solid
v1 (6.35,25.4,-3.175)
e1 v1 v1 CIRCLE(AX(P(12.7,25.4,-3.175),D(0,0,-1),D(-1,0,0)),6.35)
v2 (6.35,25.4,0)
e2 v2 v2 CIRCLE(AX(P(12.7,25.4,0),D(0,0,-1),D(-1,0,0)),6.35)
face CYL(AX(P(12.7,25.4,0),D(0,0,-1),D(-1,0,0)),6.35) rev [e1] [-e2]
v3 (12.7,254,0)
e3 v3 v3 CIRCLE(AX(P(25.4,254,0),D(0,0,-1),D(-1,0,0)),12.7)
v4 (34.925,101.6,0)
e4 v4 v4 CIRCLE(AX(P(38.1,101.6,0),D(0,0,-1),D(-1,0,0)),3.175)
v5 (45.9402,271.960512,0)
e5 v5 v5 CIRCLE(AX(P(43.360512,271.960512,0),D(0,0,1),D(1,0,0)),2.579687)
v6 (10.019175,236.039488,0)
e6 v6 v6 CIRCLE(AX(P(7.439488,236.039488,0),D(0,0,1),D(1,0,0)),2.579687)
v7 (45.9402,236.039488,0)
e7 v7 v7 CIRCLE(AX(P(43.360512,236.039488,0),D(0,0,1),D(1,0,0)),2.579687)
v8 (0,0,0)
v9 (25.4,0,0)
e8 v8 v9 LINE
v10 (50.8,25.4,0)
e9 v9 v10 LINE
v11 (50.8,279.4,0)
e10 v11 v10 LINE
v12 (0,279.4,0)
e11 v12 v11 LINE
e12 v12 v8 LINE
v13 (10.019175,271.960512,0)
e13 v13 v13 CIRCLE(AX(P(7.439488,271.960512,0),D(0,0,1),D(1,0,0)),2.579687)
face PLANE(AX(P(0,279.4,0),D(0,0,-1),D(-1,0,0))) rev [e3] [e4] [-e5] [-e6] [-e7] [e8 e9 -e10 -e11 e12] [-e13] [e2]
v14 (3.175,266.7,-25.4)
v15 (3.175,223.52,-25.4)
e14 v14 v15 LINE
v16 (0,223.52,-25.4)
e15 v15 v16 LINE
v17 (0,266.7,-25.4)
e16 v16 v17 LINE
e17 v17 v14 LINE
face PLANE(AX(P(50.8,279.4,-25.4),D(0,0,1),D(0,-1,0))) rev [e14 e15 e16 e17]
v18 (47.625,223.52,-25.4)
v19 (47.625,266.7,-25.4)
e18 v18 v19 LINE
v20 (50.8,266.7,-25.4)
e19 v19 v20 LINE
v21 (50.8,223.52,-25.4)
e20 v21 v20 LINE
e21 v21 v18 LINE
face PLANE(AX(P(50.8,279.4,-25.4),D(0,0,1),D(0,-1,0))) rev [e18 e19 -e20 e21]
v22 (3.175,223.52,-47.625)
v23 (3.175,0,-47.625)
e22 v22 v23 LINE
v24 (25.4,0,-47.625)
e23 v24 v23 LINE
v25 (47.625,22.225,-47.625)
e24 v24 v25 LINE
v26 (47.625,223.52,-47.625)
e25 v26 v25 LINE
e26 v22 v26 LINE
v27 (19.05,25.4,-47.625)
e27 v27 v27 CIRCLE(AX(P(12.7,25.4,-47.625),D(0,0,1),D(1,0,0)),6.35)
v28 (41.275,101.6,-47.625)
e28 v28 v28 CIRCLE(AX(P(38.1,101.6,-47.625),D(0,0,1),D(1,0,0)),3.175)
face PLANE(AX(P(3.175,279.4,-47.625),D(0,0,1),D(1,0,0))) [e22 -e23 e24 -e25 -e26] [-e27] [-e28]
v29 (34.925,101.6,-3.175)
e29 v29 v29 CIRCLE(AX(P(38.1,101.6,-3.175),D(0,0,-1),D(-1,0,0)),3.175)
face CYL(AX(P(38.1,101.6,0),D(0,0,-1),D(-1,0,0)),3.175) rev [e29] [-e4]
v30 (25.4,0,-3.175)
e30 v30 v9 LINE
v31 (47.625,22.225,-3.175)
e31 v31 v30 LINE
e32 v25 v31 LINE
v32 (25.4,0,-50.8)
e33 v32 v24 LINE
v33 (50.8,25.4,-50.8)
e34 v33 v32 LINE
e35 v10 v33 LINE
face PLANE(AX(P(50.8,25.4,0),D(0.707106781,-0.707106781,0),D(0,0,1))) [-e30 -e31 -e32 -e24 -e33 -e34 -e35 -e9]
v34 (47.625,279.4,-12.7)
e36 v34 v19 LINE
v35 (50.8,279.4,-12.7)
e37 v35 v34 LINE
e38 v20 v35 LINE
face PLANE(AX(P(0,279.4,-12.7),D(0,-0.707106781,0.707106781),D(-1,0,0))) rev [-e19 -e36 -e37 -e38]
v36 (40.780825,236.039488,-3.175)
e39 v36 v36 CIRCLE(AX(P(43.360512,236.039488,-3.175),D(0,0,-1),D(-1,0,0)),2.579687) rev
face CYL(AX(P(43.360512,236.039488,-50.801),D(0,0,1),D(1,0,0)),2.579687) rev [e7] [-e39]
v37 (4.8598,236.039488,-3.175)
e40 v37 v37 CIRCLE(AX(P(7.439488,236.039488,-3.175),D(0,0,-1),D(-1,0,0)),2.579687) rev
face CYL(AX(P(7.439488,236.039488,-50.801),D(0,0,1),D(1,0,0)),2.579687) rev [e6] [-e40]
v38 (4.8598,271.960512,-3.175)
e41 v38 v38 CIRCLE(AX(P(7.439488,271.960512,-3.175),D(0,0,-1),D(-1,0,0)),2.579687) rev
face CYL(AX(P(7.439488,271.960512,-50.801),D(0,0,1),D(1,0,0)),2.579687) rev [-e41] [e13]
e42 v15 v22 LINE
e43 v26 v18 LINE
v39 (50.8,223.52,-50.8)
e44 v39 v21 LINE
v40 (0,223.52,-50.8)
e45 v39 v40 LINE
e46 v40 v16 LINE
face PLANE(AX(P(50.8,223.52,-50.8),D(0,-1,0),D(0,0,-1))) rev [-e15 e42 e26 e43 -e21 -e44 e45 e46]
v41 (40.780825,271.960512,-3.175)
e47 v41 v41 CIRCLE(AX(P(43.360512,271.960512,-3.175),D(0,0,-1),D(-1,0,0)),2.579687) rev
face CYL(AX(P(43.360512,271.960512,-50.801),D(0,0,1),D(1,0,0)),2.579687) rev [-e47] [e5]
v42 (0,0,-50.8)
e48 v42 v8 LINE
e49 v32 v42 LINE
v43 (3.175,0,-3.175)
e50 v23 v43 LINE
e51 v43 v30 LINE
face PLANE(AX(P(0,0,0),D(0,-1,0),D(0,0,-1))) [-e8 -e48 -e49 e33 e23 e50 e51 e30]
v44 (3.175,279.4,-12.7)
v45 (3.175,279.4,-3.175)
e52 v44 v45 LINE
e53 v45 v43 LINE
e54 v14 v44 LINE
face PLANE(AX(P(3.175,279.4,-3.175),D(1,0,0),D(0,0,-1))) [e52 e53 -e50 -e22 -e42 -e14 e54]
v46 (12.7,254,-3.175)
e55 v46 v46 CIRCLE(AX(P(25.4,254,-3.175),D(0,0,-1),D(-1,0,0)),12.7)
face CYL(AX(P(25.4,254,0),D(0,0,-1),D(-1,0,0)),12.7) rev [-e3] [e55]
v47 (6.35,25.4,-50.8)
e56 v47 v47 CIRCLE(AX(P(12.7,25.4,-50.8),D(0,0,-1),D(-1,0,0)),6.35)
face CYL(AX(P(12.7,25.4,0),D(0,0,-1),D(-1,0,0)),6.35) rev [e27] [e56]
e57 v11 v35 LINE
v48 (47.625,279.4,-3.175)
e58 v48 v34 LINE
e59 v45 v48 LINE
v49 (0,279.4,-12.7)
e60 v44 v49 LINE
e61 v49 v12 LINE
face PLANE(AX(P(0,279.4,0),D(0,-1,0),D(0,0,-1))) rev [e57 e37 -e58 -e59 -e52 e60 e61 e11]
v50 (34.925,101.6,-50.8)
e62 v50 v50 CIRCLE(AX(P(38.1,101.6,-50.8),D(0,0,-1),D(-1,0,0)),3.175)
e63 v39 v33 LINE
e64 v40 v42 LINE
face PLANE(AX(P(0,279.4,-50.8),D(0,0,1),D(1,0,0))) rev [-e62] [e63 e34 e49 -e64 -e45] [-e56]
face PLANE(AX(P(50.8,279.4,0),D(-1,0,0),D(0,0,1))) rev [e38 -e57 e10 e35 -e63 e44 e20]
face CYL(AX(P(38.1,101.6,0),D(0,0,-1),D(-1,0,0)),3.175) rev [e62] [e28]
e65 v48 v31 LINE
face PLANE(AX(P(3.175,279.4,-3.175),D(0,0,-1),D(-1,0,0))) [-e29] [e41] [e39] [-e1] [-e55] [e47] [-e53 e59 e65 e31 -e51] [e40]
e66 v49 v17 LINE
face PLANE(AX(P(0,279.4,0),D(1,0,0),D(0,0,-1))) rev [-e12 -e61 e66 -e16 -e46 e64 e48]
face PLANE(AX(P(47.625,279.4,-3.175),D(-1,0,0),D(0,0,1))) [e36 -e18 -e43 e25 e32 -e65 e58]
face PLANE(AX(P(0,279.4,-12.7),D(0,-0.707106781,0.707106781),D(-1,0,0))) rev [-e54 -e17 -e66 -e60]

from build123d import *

# Parameters (mm, degrees)
SKETCH1_W           = 50.8
SKETCH1_H           = 50.8
SKETCH1_W_2         = 44.45
SKETCH1_H_2         = 44.45
BOSS_EXTRUDE1_DEPTH = 279.4
SKETCH2_R           = 6.35
SKETCH2_R_2         = 12.7
CUT_EXTRUDE1_DEPTH  = 289.488543967
CHAMFER1_SIZE       = 25.4
SKETCH3_R           = 3.175
CUT_EXTRUDE2_DEPTH  = 289.488543967
SKETCH4_W           = 25.4
SKETCH4_H           = 55.88
CUT_EXTRUDE3_DEPTH  = 289.488543967
CHAMFER2_SIZE       = 12.7
CUT_EXTRUDE5_REACH  = 290.489
SKETCH6_R           = 2.5796875


with BuildPart() as part:
    # Sketch1 → Boss-Extrude1 (new body)
    with BuildSketch(Plane(origin=(0, 0, 0), x_dir=(1, 0, 0), z_dir=(0, 1, 0))):
        with Locations((25.4, 25.4)):
            Rectangle(SKETCH1_W, SKETCH1_H)
        with Locations((25.4, 25.4)):
            Rectangle(SKETCH1_W_2, SKETCH1_H_2, mode=Mode.SUBTRACT)
    extrude(amount=BOSS_EXTRUDE1_DEPTH)

    # Sketch2 → Cut-Extrude1 (cut, through all)
    with BuildSketch(Plane(origin=(0, 0, -50.8), x_dir=(-1, 0, 0), z_dir=(0, 0, -1))):
        with Locations((-12.7, 25.4)):
            Circle(SKETCH2_R)
        with Locations((-25.4, 254)):
            Circle(SKETCH2_R_2)
    extrude(amount=-CUT_EXTRUDE1_DEPTH, mode=Mode.SUBTRACT)

    # Chamfer1
    # the kernel refuses this chamfer: 25.4 mm, written as the material it takes off along each edge
    with BuildSketch(Plane(origin=(50.8, 0, 65.320747894), x_dir=(-0.9996219169112966, -0.02749587661058637, 0), z_dir=(0, 0, -1))) as chamfer1_piece_1:
        Polygon((CHAMFER1_SIZE * 0.999621916911, CHAMFER1_SIZE * 0.0274958766106), (-CHAMFER1_SIZE * 0.0274958766106, CHAMFER1_SIZE * 0.999621916911), (0, 0), align=None)
    extrude(amount=181.441495789, mode=Mode.SUBTRACT)

    # Sketch3 → Cut-Extrude2 (cut, through all)
    with BuildSketch(Plane(origin=(0, 0, -50.8), x_dir=(-1, 0, 0), z_dir=(0, 0, -1))):
        with Locations((-38.1, 101.6)):
            Circle(SKETCH3_R)
    extrude(amount=-CUT_EXTRUDE2_DEPTH, mode=Mode.SUBTRACT)

    # Sketch4 → Cut-Extrude3 (cut, through all)
    with BuildSketch(Plane.ZY):
        with Locations((-38.1, 251.46)):
            Rectangle(SKETCH4_W, SKETCH4_H)
    extrude(amount=-CUT_EXTRUDE3_DEPTH, mode=Mode.SUBTRACT)

    # Chamfer2
    chamfer2_edges = [part.edges().sort_by_distance(p)[0] for p in [
        (49.2125, 279.4, -25.4),
        (1.5875, 279.4, -25.4),
    ]]
    chamfer(chamfer2_edges, length=CHAMFER2_SIZE)

    # Sketch6 → Cut-Extrude5 (cut, up to next)
    with BuildSketch(Plane.XY, mode=Mode.PRIVATE) as cut_extrude5_sk1:
        with Locations((7.439487758, 271.960512242)):
            Circle(SKETCH6_R)
    cut_extrude5_tool1 = extrude(cut_extrude5_sk1.sketch, amount=-CUT_EXTRUDE5_REACH, mode=Mode.PRIVATE) & part.part
    # Sketch6 → Cut-Extrude5 (cut, up to next)
    with BuildSketch(Plane.XY, mode=Mode.PRIVATE) as cut_extrude5_sk2:
        with Locations((7.439487758, 236.039487758)):
            Circle(SKETCH6_R)
    cut_extrude5_tool2 = extrude(cut_extrude5_sk2.sketch, amount=-CUT_EXTRUDE5_REACH, mode=Mode.PRIVATE) & part.part
    # Sketch6 → Cut-Extrude5 (cut, up to next)
    with BuildSketch(Plane.XY, mode=Mode.PRIVATE) as cut_extrude5_sk3:
        with Locations((43.360512242, 236.039487758)):
            Circle(SKETCH6_R)
    cut_extrude5_tool3 = extrude(cut_extrude5_sk3.sketch, amount=-CUT_EXTRUDE5_REACH, mode=Mode.PRIVATE) & part.part
    # Sketch6 → Cut-Extrude5 (cut, up to next)
    with BuildSketch(Plane.XY, mode=Mode.PRIVATE) as cut_extrude5_sk4:
        with Locations((43.360512242, 271.960512242)):
            Circle(SKETCH6_R)
    cut_extrude5_tool4 = extrude(cut_extrude5_sk4.sketch, amount=-CUT_EXTRUDE5_REACH, mode=Mode.PRIVATE) & part.part
    add(cut_extrude5_tool1.solids().sort_by_distance((7.439488, 271.960512, 0))[0], mode=Mode.SUBTRACT)
    add(cut_extrude5_tool2.solids().sort_by_distance((7.439488, 236.039488, 0))[0], mode=Mode.SUBTRACT)
    add(cut_extrude5_tool3.solids().sort_by_distance((43.360512, 236.039488, 0))[0], mode=Mode.SUBTRACT)
    add(cut_extrude5_tool4.solids().sort_by_distance((43.360512, 271.960512, 0))[0], mode=Mode.SUBTRACT)


solid = part.part
